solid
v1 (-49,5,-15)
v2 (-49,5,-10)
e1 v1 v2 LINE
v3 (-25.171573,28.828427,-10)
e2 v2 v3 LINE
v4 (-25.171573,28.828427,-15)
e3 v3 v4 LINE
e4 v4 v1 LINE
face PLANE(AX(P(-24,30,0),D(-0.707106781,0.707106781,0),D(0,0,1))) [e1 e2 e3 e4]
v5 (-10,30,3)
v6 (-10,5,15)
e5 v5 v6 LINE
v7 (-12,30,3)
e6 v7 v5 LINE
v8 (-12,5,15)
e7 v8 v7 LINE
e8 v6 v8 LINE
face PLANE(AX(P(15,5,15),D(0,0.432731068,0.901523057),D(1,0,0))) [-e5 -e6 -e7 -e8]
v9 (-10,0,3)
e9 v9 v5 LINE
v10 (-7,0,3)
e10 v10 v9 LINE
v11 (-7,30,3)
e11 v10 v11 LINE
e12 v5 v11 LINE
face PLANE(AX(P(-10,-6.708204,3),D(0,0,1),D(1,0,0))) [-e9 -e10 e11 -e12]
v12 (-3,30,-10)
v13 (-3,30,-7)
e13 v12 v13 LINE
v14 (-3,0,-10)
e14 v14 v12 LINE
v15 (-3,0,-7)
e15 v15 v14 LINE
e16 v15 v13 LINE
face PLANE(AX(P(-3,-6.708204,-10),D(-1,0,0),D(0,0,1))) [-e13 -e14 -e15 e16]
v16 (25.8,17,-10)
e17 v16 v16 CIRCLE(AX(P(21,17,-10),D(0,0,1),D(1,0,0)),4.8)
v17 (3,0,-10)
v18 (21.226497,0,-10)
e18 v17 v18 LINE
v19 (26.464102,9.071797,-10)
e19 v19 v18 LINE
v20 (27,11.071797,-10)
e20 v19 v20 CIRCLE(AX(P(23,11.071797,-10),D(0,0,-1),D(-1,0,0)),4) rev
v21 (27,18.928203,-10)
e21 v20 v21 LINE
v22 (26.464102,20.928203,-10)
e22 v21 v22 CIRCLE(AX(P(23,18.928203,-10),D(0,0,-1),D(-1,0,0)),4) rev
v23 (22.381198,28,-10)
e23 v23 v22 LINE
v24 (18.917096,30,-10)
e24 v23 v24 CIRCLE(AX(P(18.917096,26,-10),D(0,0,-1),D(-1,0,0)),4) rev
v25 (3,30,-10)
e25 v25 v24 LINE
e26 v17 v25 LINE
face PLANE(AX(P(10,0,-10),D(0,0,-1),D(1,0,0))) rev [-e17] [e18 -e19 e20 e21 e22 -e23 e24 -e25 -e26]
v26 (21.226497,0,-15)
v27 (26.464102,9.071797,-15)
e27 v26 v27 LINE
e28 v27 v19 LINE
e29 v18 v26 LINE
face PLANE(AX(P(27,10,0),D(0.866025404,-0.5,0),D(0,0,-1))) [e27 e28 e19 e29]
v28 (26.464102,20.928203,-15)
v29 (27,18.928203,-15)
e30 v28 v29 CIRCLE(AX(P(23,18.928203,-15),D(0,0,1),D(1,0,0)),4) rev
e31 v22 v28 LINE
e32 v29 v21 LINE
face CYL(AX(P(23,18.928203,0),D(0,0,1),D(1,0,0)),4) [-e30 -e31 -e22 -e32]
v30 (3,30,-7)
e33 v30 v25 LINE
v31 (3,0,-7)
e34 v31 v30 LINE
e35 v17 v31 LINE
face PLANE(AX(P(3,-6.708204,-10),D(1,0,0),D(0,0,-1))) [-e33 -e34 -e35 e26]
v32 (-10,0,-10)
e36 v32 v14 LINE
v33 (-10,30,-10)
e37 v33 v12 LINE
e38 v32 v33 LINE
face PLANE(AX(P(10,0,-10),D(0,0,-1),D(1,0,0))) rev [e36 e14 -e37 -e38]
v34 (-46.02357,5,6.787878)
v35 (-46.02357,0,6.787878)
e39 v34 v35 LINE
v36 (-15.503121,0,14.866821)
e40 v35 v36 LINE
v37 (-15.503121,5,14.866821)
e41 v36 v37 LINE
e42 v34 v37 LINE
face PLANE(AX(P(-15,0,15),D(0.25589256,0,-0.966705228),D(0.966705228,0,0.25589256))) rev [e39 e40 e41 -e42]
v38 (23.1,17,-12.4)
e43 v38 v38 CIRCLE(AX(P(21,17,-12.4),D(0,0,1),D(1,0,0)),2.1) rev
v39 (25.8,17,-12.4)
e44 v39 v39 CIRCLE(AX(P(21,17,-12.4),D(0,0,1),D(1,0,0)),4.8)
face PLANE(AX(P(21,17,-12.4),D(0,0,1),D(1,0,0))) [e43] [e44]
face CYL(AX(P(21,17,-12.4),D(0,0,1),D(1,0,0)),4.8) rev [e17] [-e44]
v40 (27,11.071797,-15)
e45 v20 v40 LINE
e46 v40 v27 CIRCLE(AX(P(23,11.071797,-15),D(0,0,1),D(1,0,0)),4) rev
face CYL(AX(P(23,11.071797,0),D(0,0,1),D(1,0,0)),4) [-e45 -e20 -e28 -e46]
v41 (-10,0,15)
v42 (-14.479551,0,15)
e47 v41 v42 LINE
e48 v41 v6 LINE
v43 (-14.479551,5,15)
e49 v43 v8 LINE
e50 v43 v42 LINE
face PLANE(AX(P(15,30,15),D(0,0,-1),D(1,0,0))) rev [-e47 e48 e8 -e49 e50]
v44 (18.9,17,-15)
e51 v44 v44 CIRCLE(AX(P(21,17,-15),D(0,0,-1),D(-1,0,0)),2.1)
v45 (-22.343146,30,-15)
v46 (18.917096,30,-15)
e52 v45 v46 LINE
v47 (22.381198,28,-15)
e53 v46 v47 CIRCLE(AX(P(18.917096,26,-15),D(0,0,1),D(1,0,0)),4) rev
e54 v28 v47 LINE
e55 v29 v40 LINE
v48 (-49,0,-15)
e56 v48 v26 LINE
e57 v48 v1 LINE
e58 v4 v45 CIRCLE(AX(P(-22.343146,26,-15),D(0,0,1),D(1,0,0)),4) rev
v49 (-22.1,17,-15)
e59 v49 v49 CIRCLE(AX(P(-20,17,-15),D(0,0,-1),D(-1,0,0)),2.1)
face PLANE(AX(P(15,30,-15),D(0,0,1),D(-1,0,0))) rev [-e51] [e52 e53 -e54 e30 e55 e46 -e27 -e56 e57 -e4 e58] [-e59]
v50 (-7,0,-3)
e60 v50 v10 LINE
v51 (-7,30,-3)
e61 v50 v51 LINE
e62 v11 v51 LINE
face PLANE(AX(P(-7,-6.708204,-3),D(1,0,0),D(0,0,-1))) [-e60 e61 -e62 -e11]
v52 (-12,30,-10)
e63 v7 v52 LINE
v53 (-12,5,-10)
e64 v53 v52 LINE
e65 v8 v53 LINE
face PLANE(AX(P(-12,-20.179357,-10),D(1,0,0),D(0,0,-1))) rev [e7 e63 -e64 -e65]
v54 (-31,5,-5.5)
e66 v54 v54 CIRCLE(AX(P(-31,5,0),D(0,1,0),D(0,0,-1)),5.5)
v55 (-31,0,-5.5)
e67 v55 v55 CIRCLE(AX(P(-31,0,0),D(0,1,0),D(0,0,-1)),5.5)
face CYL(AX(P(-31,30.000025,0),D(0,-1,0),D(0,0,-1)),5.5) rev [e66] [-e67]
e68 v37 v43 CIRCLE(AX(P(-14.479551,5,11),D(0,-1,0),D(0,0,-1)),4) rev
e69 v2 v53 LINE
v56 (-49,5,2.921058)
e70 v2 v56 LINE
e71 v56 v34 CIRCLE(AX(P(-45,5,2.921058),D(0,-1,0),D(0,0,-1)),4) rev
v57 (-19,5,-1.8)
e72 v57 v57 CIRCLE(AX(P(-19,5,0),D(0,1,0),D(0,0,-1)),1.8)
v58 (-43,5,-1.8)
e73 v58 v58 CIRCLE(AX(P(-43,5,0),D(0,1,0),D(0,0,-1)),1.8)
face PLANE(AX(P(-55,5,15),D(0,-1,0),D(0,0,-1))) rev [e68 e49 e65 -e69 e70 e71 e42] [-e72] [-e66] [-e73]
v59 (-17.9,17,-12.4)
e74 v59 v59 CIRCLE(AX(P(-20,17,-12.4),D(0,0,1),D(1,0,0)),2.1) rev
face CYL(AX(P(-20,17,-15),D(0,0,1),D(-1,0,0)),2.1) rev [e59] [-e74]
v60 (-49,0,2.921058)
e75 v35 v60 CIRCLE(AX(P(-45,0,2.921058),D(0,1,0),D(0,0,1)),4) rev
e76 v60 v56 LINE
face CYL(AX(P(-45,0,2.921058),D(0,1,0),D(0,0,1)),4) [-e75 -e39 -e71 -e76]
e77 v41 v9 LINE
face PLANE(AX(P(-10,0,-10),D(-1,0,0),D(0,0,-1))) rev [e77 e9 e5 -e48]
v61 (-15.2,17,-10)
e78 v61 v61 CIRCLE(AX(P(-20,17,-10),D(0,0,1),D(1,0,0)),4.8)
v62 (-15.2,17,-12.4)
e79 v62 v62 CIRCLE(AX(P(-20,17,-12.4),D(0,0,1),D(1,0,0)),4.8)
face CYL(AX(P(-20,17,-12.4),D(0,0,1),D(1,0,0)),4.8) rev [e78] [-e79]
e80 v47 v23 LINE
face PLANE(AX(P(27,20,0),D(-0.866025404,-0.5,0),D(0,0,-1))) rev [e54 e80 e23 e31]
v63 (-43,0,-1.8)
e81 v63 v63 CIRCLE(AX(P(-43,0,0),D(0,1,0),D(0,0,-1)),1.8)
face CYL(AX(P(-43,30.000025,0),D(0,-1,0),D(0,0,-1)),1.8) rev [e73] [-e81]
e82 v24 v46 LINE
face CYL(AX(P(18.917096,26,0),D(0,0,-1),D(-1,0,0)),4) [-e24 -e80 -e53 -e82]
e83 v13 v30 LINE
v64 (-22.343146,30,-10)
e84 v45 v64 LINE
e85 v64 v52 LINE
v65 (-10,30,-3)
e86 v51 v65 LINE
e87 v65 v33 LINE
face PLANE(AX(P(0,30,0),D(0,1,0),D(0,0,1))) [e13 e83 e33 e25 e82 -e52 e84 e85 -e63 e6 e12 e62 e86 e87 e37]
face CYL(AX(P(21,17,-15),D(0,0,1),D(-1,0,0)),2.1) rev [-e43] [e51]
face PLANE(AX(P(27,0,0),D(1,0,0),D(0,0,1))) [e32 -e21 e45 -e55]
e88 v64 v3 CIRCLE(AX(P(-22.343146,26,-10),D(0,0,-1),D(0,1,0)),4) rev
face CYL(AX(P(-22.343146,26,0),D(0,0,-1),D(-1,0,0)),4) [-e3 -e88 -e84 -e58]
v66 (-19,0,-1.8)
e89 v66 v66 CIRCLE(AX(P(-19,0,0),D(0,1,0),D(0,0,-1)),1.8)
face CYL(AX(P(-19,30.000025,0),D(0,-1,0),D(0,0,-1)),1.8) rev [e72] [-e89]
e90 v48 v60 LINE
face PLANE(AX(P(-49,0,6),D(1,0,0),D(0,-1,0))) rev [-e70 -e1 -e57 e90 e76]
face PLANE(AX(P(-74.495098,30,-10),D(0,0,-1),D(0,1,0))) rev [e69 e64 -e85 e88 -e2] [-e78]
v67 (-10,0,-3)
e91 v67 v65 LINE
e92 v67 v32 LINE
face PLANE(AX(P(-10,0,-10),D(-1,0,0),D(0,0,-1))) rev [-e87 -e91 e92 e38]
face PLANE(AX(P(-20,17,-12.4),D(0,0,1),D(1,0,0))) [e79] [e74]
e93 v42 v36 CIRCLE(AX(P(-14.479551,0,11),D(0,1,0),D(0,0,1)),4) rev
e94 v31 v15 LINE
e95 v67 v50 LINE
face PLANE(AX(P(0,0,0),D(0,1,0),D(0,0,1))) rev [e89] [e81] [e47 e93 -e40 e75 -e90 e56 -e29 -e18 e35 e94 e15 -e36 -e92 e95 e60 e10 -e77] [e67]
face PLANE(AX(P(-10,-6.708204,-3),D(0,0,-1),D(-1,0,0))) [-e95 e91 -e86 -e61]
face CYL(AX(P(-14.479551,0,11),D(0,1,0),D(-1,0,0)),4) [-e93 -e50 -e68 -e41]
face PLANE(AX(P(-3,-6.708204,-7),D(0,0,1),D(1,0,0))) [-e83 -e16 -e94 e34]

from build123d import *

# Parameters (mm, degrees)
SKETCH1_W                     = 30
SKETCH1_H                     = 30
BOSS_EXTRUDE1_DEPTH           = 30
SKETCH2_W                     = 20
SKETCH2_H                     = 20
CUT_EXTRUDE1_DEPTH            = 37.742346142
SKETCH3_W                     = 30
SKETCH3_H                     = 5
BOSS_EXTRUDE2_DEPTH           = 40
SKETCH4_R                     = 5.5
SKETCH4_R_2                   = 1.8
CUT_EXTRUDE2_DEPTH            = 65.420493634
CUT_EXTRUDE3_DEPTH            = 63.24949799
SKETCH5_W                     = 5
SKETCH5_H                     = 25
BOSS_EXTRUDE4_DEPTH           = 34
CHAMFER1_SIZE                 = 25
SKETCH8_R                     = 2.1
CUT_EXTRUDE4_DEPTH            = 63.657800791
SKETCH9_W                     = 5
SKETCH9_H                     = 30
BOSS_EXTRUDE5_DEPTH           = 12
CHAMFER2_SIZE                 = 10
CHAMFER2_SIZE2                = 5.773502692
SKETCH10_R                    = 2.1
CUT_EXTRUDE5_DEPTH            = 63.657800791
BODY_MOVE_COPY1_START         = -15
BODY_MOVE_COPY1_DEPTH         = 31
BODY_MOVE_COPY1_START_2       = -10
BODY_MOVE_COPY1_2_DEPTH       = 26
BODY_MOVE_COPY1_3_OUTLINE_W   = 34
BODY_MOVE_COPY1_3_OUTLINE_H   = 5
BODY_MOVE_COPY1_3_DEPTH       = 30
BODY_MOVE_COPY1_4_DEPTH       = 5
BODY_MOVE_COPY1_5_OUTLINE_R   = 5.5
BODY_MOVE_COPY1_5_OUTLINE_R_2 = 1.8
BODY_MOVE_COPY1_5_DEPTH       = 5
SKETCH11_W                    = 3
SKETCH11_H                    = 25
CUT_EXTRUDE6_DEPTH            = 25
SKETCH12_W                    = 25
SKETCH12_H                    = 25
CUT_EXTRUDE7_DEPTH            = 60.380131357
SKETCH13_W                    = 3
SKETCH13_H                    = 6
SKETCH13_W_2                  = 6
SKETCH13_H_2                  = 3
BOSS_EXTRUDE6_DEPTH           = 30
SKETCH14_R                    = 4.8
CUT_EXTRUDE9_DEPTH            = 2.4
CHAMFER3_SIZE                 = 12
CHAMFER3_SIZE2                = 25
FILLET1_R                     = 4
FILLET2_R                     = 4


with BuildPart() as part:
    # Sketch1 → Boss-Extrude1 (new body)
    with BuildSketch(Plane(origin=(0, 0, 0), x_dir=(1, 0, 0), z_dir=(0, 1, 0))):
        Rectangle(SKETCH1_W, SKETCH1_H)
    extrude(amount=BOSS_EXTRUDE1_DEPTH)

    # Sketch2 → Cut-Extrude1 (cut, through all)
    with BuildSketch(Plane(origin=(0, 30, 0), x_dir=(1, 0, 0), z_dir=(0, 1, 0))):
        Rectangle(SKETCH2_W, SKETCH2_H)
    extrude(amount=-CUT_EXTRUDE1_DEPTH, mode=Mode.SUBTRACT)

    # Sketch3 → Boss-Extrude2 (add)
    with BuildSketch(Plane(origin=(15, 0, 0), x_dir=(0, 0, -1), z_dir=(1, 0, 0))):
        with Locations((0, 2.5)):
            Rectangle(SKETCH3_W, SKETCH3_H)
    extrude(amount=BOSS_EXTRUDE2_DEPTH)

    # Sketch4 → Cut-Extrude2 (cut, through all)
    with BuildSketch(Plane.XZ):
        with Locations(Location((31, 0, 0), (0, 0, 270))):
            Circle(SKETCH4_R)
        with Locations(Location((19, 0, 0), (0, 0, 270))):
            Circle(SKETCH4_R_2)
        with Locations(Location((43, 0, 0), (0, 0, 270))):
            Circle(SKETCH4_R_2)
    extrude(amount=-CUT_EXTRUDE2_DEPTH, mode=Mode.SUBTRACT)

    # Sketch7 → Cut-Extrude3 (cut, through all)
    with BuildSketch(Plane(origin=(0, 5, 0), x_dir=(1, 0, 0), z_dir=(0, 1, 0))):
        Polygon((15, -15), (49, -6), (49, 15), (55, 15), (55, -15), align=None)
    extrude(amount=-CUT_EXTRUDE3_DEPTH, mode=Mode.SUBTRACT)

    # Sketch5 → Boss-Extrude4 (add)
    with BuildSketch(Plane(origin=(15, 0, 0), x_dir=(0, 0, -1), z_dir=(1, 0, 0))):
        with Locations((12.5, 17.5)):
            Rectangle(SKETCH5_W, SKETCH5_H)
    extrude(amount=BOSS_EXTRUDE4_DEPTH)

    # Chamfer1
    chamfer1_edges = [part.edges().sort_by_distance(p)[0] for p in [
        (49, 30, -12.5),
    ]]
    chamfer(chamfer1_edges, length=CHAMFER1_SIZE)

    # Sketch8 → Cut-Extrude4 (cut, through all)
    with BuildSketch(Plane.XY.offset(-10)):
        with Locations((20, 17)):
            Circle(SKETCH8_R)
    extrude(amount=-CUT_EXTRUDE4_DEPTH, mode=Mode.SUBTRACT)

    # Sketch9 → Boss-Extrude5 (add)
    with BuildSketch(Plane.ZY.offset(15)):
        with Locations((-12.5, 15)):
            Rectangle(SKETCH9_W, SKETCH9_H)
    extrude(amount=BOSS_EXTRUDE5_DEPTH)

    # Chamfer2
    chamfer2_edges = [part.edges().sort_by_distance(p)[0] for p in [
        (-27, 30, -12.5),
        (-27, 0, -12.5),
    ]]
    chamfer2_side = [part.faces().sort_by_distance(p)[0] for p in [
        (-27, 15, -12.5),
    ]]
    chamfer(chamfer2_edges, length=CHAMFER2_SIZE, length2=CHAMFER2_SIZE2, reference=chamfer2_side[0])

    # Sketch10 → Cut-Extrude5 (cut, through all)
    with BuildSketch(Plane.XY.offset(-10)):
        with Locations((-21, 17)):
            Circle(SKETCH10_R)
    extrude(amount=-CUT_EXTRUDE5_DEPTH, mode=Mode.SUBTRACT)

    # Body-Move/Copy1: read off the stored shape, not the designer's step
    # Body-Move/Copy1 outline → Body-Move/Copy1 (cut)
    with BuildSketch(Plane.XY.offset(BODY_MOVE_COPY1_START)):
        Polygon((24, 30), (21.226497308, 30), (27, 20), (27, 10), (21.226497308, 0), (49, 0), (49, 5), align=None)
        with BuildLine():
            ThreePointArc((-20.5, 14.960392195), (-17.9, 17), (-20.5, 19.039607805))
            ThreePointArc((-20.5, 19.039607805), (-18.9, 17), (-20.5, 14.960392195))
        make_face()
        with BuildLine():
            ThreePointArc((20.5, 14.960392195), (23.1, 17), (20.5, 19.039607805))
            ThreePointArc((20.5, 19.039607805), (22.1, 17), (20.5, 14.960392195))
        make_face()
    extrude(amount=BODY_MOVE_COPY1_DEPTH, mode=Mode.SUBTRACT)

    # Body-Move_Copy1 2 outline → Body-Move_Copy1 2 (cut)
    with BuildSketch(Plane.XY.offset(BODY_MOVE_COPY1_START_2)):
        Polygon((24.113248654, 5), (15, 5), (15, 0), (21.226497308, 0), align=None)
    extrude(amount=BODY_MOVE_COPY1_2_DEPTH, mode=Mode.SUBTRACT)

    # Body-Move_Copy1 3 outline → Body-Move_Copy1 3 (add)
    with BuildSketch(Plane.XY.offset(BODY_MOVE_COPY1_START)):
        with Locations((-32, 2.5)):
            Rectangle(BODY_MOVE_COPY1_3_OUTLINE_W, BODY_MOVE_COPY1_3_OUTLINE_H)
    extrude(amount=BODY_MOVE_COPY1_3_DEPTH)

    # Body-Move_Copy1 4 outline → Body-Move_Copy1 4 (add)
    with BuildSketch(Plane.XY.offset(BODY_MOVE_COPY1_START)):
        Polygon((-27, 20), (-21.226497308, 30), (-24, 30), (-49, 5), (-24.113248654, 5), (-27, 10), align=None)
        with BuildLine():
            ThreePointArc((-20.5, 14.960392195), (-22.1, 17), (-20.5, 19.039607805))
            ThreePointArc((-20.5, 19.039607805), (-23.1, 17), (-20.5, 14.960392195))
        make_face()
        with BuildLine():
            ThreePointArc((20.5, 14.960392195), (18.9, 17), (20.5, 19.039607805))
            ThreePointArc((20.5, 19.039607805), (17.9, 17), (20.5, 14.960392195))
        make_face()
    extrude(amount=BODY_MOVE_COPY1_4_DEPTH)

    # Body-Move_Copy1 5 outline → Body-Move_Copy1 5 (cut)
    with BuildSketch(Plane(origin=(0, 0, 0), x_dir=(1, 0, 0), z_dir=(0, 1, 0))):
        with Locations((-31, 0)):
            Circle(BODY_MOVE_COPY1_5_OUTLINE_R)
        with Locations((-19, 0)):
            Circle(BODY_MOVE_COPY1_5_OUTLINE_R_2)
        with Locations((-43, 0)):
            Circle(BODY_MOVE_COPY1_5_OUTLINE_R_2)
        Polygon((-49, -15), (-15, -15), (-49, -6), align=None)
    extrude(amount=BODY_MOVE_COPY1_5_DEPTH, mode=Mode.SUBTRACT)

    # Sketch11 → Cut-Extrude6 (cut)
    with BuildSketch(Plane(origin=(0, 30, 0), x_dir=(1, 0, 0), z_dir=(0, 1, 0))):
        with Locations((-13.5, -2.5)):
            Rectangle(SKETCH11_W, SKETCH11_H)
    extrude(amount=-CUT_EXTRUDE6_DEPTH, mode=Mode.SUBTRACT)

    # Sketch12 → Cut-Extrude7 (cut, through all)
    with BuildSketch(Plane(origin=(0, 30, 0), x_dir=(1, 0, 0), z_dir=(0, 1, 0))):
        with Locations((2.5, -2.5)):
            Rectangle(SKETCH12_W, SKETCH12_H)
    extrude(amount=-CUT_EXTRUDE7_DEPTH, mode=Mode.SUBTRACT)

    # Sketch13 → Boss-Extrude6 (add)
    with BuildSketch(Plane(origin=(0, 30, 0), x_dir=(1, 0, 0), z_dir=(0, 1, 0))):
        with Locations((-8.5, 0)):
            Rectangle(SKETCH13_W, SKETCH13_H)
        with Locations((0, 8.5)):
            Rectangle(SKETCH13_W_2, SKETCH13_H_2)
    extrude(amount=-BOSS_EXTRUDE6_DEPTH)

    # Sketch14 → Cut-Extrude9 (cut)
    with BuildSketch(Plane.XY.offset(-10)):
        with Locations((-20, 17)):
            Circle(SKETCH14_R)
        with Locations((21, 17)):
            Circle(SKETCH14_R)
    extrude(amount=-CUT_EXTRUDE9_DEPTH, mode=Mode.SUBTRACT)

    # Chamfer3
    chamfer3_edges = [part.edges().sort_by_distance(p)[0] for p in [
        (-11, 30, 15),
    ]]
    chamfer3_side = [part.faces().sort_by_distance(p)[0] for p in [
        (-18, 30, -10.542718717),
    ]]
    chamfer(chamfer3_edges, length=CHAMFER3_SIZE, length2=CHAMFER3_SIZE2, reference=chamfer3_side[0])

    # Fillet1
    fillet1_edges = [part.edges().sort_by_distance(p)[0] for p in [
        (-49, 2.5, 6),
        (-15, 2.5, 15),
    ]]
    fillet(fillet1_edges, radius=FILLET1_R)

    # Fillet2
    fillet2_edges = [part.edges().sort_by_distance(p)[0] for p in [
        (27, 10, -12.5),
        (27, 20, -12.5),
        (21.226497308, 30, -12.5),
        (-24, 30, -12.5),
    ]]
    fillet(fillet2_edges, radius=FILLET2_R)


solid = part.part
